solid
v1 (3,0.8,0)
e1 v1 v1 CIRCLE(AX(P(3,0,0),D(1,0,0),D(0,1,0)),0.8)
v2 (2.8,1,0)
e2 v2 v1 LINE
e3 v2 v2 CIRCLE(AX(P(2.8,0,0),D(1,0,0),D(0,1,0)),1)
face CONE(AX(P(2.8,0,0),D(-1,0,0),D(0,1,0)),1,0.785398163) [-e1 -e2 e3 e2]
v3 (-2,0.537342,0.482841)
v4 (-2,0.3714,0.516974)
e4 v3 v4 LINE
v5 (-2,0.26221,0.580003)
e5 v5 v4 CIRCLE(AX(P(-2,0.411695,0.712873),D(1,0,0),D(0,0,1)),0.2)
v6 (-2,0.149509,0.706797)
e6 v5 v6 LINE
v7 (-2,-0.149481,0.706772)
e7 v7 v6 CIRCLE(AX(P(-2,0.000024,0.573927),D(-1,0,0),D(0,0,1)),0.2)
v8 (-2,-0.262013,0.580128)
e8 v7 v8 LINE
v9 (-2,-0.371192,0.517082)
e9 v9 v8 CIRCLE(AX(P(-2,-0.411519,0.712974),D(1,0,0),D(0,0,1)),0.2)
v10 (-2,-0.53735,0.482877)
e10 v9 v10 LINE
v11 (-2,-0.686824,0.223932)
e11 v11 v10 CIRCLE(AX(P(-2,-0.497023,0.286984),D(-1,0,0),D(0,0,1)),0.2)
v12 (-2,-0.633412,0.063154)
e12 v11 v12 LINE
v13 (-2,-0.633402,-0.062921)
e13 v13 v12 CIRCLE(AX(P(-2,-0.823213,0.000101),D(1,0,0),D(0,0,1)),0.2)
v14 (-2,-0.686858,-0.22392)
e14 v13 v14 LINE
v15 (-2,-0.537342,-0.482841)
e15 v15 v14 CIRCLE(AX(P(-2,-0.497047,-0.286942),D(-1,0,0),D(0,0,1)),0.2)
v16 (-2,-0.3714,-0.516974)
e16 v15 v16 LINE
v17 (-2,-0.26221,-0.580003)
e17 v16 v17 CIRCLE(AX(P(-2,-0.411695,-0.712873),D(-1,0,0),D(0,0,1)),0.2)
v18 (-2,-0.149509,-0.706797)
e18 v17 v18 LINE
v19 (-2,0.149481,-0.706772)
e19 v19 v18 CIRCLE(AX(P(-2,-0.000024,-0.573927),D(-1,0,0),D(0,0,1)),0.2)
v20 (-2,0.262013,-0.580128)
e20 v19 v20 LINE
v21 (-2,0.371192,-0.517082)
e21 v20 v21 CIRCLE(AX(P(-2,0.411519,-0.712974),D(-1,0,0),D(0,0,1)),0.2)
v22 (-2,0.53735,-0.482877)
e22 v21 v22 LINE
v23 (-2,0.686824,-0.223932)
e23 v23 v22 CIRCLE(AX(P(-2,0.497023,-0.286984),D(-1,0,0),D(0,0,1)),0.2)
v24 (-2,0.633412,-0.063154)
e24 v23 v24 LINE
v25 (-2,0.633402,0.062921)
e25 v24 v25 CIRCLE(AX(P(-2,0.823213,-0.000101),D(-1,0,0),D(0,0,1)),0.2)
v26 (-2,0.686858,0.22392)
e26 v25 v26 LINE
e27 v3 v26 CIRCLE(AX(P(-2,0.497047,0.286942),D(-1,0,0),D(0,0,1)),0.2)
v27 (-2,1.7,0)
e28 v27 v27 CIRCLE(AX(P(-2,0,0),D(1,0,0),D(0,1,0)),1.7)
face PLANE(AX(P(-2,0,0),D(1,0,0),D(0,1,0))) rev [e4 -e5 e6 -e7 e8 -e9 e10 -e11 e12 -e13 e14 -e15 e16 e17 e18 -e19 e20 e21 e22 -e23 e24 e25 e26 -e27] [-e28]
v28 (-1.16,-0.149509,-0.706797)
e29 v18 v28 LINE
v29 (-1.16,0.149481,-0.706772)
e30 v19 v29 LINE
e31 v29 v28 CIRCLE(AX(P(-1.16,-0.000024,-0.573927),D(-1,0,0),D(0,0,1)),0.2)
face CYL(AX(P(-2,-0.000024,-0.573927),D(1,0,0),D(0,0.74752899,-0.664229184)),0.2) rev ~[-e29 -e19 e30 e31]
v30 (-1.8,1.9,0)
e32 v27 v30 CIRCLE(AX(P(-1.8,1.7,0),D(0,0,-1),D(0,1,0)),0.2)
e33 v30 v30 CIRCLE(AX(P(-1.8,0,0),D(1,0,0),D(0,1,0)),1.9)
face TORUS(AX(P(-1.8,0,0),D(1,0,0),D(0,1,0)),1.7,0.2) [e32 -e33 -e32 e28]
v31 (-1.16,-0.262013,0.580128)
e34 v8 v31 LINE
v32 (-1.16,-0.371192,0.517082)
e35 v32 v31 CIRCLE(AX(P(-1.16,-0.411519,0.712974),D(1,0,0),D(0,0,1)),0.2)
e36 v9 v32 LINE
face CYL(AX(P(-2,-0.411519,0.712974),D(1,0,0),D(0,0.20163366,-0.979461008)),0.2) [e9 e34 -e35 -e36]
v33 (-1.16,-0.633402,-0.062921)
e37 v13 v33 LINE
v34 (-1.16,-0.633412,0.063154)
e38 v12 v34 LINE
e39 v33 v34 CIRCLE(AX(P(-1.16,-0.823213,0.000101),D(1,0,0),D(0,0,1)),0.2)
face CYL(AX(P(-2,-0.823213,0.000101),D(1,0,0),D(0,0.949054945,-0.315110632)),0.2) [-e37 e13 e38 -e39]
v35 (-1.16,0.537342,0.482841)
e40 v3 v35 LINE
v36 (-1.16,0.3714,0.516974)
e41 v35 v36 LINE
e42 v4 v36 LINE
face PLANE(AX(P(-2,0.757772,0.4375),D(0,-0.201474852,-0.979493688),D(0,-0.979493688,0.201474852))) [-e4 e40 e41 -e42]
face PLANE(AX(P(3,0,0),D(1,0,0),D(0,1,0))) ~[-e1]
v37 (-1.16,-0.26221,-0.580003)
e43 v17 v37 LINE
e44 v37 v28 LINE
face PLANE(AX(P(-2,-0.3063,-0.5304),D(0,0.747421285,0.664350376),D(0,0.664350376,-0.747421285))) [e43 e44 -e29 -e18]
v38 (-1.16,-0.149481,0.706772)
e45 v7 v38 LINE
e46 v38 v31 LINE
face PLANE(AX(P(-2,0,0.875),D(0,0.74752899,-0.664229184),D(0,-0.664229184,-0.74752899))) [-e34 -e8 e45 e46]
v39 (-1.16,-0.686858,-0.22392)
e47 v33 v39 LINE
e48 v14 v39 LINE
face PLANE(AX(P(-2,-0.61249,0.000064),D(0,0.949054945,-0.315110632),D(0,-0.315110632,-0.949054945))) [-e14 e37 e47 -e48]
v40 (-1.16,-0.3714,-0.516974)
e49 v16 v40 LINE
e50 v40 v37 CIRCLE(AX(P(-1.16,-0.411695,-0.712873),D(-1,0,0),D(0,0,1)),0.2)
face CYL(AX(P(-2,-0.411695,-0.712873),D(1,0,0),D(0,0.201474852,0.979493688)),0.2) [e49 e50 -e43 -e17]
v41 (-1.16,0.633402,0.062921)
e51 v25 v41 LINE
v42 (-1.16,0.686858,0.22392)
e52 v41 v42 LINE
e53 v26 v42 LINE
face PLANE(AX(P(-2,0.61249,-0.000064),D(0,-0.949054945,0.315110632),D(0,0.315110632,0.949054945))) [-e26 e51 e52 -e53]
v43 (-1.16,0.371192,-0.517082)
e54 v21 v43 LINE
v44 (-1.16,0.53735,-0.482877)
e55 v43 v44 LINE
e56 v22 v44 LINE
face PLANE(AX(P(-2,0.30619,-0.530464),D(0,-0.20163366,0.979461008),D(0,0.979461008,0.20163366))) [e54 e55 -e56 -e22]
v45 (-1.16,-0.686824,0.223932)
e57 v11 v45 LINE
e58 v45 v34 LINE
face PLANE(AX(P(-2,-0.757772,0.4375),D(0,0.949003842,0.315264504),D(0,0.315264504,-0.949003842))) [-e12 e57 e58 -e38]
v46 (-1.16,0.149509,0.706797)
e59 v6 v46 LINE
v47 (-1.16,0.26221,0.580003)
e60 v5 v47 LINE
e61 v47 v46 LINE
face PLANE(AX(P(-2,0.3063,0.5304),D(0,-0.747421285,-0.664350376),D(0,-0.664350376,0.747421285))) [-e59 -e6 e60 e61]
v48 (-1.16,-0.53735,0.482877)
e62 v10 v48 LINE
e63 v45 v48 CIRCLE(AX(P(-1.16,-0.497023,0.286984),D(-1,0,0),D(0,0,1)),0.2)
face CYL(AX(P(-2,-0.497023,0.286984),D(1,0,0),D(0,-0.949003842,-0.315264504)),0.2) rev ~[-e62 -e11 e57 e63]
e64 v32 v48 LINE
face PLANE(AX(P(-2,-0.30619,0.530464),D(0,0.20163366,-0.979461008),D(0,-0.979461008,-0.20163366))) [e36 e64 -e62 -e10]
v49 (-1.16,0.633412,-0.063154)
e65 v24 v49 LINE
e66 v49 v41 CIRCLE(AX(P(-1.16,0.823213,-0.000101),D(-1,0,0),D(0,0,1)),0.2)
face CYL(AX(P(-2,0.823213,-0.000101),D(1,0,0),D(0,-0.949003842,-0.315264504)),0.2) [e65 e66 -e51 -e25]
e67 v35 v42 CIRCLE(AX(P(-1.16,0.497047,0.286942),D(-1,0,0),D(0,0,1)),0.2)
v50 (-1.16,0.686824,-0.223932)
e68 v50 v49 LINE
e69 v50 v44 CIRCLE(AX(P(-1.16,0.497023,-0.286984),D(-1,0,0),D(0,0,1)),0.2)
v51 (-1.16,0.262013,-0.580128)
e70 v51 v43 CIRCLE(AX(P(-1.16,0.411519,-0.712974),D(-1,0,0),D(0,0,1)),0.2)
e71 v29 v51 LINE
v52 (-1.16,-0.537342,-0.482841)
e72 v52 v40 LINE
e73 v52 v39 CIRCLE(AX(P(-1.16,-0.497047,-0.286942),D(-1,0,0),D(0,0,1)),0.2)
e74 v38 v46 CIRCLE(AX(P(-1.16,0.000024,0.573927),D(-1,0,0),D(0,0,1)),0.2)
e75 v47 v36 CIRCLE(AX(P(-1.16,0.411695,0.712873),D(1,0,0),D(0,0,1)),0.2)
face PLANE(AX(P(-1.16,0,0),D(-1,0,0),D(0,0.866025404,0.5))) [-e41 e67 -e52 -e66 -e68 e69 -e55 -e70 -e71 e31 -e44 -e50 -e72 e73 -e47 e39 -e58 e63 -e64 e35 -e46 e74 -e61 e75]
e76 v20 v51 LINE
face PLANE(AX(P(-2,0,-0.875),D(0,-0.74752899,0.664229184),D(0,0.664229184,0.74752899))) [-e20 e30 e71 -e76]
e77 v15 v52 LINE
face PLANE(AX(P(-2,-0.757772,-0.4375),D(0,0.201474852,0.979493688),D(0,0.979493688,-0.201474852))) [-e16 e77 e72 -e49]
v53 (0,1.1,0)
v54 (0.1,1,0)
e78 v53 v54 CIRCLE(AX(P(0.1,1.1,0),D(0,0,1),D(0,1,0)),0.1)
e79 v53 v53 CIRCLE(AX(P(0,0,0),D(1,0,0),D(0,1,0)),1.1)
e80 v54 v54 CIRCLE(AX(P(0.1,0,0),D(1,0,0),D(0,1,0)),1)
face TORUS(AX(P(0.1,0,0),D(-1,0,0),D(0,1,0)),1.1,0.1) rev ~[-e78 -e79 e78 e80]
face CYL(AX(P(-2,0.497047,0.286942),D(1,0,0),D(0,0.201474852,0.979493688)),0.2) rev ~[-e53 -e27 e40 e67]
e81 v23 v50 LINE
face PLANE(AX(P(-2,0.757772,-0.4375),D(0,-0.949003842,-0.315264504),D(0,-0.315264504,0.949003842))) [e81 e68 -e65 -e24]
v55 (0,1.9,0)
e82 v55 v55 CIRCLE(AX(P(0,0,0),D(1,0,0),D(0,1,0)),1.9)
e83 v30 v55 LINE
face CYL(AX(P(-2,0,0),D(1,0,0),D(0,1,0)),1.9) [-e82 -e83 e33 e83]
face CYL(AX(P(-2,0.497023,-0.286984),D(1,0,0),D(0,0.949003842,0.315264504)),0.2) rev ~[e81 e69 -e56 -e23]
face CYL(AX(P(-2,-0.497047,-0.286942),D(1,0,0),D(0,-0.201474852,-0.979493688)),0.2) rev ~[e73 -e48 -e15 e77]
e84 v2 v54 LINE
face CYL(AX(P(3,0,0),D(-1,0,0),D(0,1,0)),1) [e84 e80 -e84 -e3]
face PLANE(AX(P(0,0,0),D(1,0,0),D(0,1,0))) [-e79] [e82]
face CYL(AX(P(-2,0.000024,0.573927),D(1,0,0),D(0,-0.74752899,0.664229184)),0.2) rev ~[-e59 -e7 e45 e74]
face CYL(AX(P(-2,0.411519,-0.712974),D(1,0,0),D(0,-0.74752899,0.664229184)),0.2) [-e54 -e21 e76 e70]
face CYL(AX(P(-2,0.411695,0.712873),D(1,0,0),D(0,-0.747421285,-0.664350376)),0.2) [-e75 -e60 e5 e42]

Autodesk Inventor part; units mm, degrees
ref_plane "YZ Plane" through (0, 0, 0) normal (1, 0, 0) x (0, 1, 0)
ref_plane "XZ Plane" through (0, 0, 0) normal (0, 1, 0) x (-1, 0, 0)
ref_plane "XY Plane" through (0, 0, 0) normal (0, 0, 1) x (1, 0, 0)
sketch "Sketch1" plane through (0, 0, 0) normal (0, 0, 1) x (1, 0, 0)
  line L0 (0, 0) -> (3, 0)
  line L1 (3, 0) -> (3, 1)
  line L2 (3, 1) -> (0, 1)
  line L3 (0, 1) -> (0, 0)
  line L4 (0, 0) -> (-2, 0)
  line L5 (-2, 0) -> (-2, 1.9)
  line L6 (-2, 1.9) -> (0, 1.9)
  line L7 (0, 1.9) -> (0, 0)
  dimension "d0" = 2
  dimension "d1" = 3.8
  dimension "d2" = 2
  dimension "d3" = 3
revolve "Revolution1" add sketch "Sketch1" angle 360 about axis through (0, 0, 0) along (1, 0, 0)
thread "Thread1" size "M2x0.4" class "6g" standard "ISO Metric profile" length 3
sketch "Sketch2" plane through (-2, 0, 0) normal (-1, 0, 0) x (0, 0, 1)
  circle A0 centre (0, 0) radius 0.875 construction
  circle A1 centre (0, 0) radius 0.6125 construction
  line L0 (-0.5304, -0.3063) -> (-0.875, 0)
  line L1 (0, 0) -> (-0.5304, -0.3063)
  line L2 (0, 0) -> (-0.5304, 0.3062)
  line L3 (-2.66, 0) -> (2.66, 0) construction
  line L4 (-0.875, 0) -> (-0.5304, 0.3062)
  dimension "d21" = 1.75
  dimension "d19" = 60
  dimension "d20" = 30
  dimension "d26" = 1.225
extrude "Extrusion1" cut sketch "Sketch2" against normal blind 0.84
pattern_circular "Circular Pattern1" count 6 over 360 about axis through (-2, 0, 0) along (1, 0, 0) of "Extrusion1"
fillet "Fillet2" radius 0.2 6 edges at (-1.58, 0.7578, -0.4375) (-1.58, 0.7578, 0.4375) (-1.58, 0, 0.875) (-1.58, -0.7578, 0.4375) (-1.58, -0.7578, -0.4375) (-1.58, 0, -0.875)
fillet "Fillet3" radius 0.2 6 edges at (-1.58, 0.6125, 0) (-1.58, 0.3062, -0.5304) (-1.58, -0.3063, -0.5304) (-1.58, -0.6125, 0) (-1.58, -0.3063, 0.5304) (-1.58, 0.3062, 0.5304)
fillet "Fillet4" radius 0.2 1 edges at (-2, -1.9, 0)
fillet "Fillet5" radius 0.1 1 edges at (0, -1, 0)
chamfer "Chamfer2" distance 0.2 angle 45 1 edges at (3, -1, 0)
equation "\"d0\" = d"
equation "\"d1\" = dk"
equation "\"d2\" = k"
equation "\"d3\" = l_"
equation "\"d6\" = b"
equation "\"d21\" = A_"
equation "\"d20\" = 0.5 * d19"
equation "\"d26\" = 0.7 * d21"
equation "\"d27\" = t"
equation "\"d32\" = v"
equation "\"d33\" = v"
equation "\"d34\" = v"
equation "\"d35\" = r"
equation "\"d36\" = v"
equation "\"A_\" = 1.75"
equation "\"d\" = 2"
equation "\"dk\" = 3.8"
equation "\"k\" = 2"
equation "\"l_\" = 3"
equation "\"lg\" = 0"
equation "\"t\" = 0.84"
equation "\"w\" = 0.55"
equation "\"v\" = 0.2"
equation "\"r\" = 0.1"
equation "\"da\" = 2.6"
equation "\"p\" = 0.4"
equation "\"ds_\" = d"
equation "\"GAL\" = 0.61345 * p"
equation "\"ls\" = 0"
equation "\"b\" = l_ - lg"
properties part number "Inbusschraube mit Innenrund ISO 14579 - M2x3-8.8" material "Stahl"
